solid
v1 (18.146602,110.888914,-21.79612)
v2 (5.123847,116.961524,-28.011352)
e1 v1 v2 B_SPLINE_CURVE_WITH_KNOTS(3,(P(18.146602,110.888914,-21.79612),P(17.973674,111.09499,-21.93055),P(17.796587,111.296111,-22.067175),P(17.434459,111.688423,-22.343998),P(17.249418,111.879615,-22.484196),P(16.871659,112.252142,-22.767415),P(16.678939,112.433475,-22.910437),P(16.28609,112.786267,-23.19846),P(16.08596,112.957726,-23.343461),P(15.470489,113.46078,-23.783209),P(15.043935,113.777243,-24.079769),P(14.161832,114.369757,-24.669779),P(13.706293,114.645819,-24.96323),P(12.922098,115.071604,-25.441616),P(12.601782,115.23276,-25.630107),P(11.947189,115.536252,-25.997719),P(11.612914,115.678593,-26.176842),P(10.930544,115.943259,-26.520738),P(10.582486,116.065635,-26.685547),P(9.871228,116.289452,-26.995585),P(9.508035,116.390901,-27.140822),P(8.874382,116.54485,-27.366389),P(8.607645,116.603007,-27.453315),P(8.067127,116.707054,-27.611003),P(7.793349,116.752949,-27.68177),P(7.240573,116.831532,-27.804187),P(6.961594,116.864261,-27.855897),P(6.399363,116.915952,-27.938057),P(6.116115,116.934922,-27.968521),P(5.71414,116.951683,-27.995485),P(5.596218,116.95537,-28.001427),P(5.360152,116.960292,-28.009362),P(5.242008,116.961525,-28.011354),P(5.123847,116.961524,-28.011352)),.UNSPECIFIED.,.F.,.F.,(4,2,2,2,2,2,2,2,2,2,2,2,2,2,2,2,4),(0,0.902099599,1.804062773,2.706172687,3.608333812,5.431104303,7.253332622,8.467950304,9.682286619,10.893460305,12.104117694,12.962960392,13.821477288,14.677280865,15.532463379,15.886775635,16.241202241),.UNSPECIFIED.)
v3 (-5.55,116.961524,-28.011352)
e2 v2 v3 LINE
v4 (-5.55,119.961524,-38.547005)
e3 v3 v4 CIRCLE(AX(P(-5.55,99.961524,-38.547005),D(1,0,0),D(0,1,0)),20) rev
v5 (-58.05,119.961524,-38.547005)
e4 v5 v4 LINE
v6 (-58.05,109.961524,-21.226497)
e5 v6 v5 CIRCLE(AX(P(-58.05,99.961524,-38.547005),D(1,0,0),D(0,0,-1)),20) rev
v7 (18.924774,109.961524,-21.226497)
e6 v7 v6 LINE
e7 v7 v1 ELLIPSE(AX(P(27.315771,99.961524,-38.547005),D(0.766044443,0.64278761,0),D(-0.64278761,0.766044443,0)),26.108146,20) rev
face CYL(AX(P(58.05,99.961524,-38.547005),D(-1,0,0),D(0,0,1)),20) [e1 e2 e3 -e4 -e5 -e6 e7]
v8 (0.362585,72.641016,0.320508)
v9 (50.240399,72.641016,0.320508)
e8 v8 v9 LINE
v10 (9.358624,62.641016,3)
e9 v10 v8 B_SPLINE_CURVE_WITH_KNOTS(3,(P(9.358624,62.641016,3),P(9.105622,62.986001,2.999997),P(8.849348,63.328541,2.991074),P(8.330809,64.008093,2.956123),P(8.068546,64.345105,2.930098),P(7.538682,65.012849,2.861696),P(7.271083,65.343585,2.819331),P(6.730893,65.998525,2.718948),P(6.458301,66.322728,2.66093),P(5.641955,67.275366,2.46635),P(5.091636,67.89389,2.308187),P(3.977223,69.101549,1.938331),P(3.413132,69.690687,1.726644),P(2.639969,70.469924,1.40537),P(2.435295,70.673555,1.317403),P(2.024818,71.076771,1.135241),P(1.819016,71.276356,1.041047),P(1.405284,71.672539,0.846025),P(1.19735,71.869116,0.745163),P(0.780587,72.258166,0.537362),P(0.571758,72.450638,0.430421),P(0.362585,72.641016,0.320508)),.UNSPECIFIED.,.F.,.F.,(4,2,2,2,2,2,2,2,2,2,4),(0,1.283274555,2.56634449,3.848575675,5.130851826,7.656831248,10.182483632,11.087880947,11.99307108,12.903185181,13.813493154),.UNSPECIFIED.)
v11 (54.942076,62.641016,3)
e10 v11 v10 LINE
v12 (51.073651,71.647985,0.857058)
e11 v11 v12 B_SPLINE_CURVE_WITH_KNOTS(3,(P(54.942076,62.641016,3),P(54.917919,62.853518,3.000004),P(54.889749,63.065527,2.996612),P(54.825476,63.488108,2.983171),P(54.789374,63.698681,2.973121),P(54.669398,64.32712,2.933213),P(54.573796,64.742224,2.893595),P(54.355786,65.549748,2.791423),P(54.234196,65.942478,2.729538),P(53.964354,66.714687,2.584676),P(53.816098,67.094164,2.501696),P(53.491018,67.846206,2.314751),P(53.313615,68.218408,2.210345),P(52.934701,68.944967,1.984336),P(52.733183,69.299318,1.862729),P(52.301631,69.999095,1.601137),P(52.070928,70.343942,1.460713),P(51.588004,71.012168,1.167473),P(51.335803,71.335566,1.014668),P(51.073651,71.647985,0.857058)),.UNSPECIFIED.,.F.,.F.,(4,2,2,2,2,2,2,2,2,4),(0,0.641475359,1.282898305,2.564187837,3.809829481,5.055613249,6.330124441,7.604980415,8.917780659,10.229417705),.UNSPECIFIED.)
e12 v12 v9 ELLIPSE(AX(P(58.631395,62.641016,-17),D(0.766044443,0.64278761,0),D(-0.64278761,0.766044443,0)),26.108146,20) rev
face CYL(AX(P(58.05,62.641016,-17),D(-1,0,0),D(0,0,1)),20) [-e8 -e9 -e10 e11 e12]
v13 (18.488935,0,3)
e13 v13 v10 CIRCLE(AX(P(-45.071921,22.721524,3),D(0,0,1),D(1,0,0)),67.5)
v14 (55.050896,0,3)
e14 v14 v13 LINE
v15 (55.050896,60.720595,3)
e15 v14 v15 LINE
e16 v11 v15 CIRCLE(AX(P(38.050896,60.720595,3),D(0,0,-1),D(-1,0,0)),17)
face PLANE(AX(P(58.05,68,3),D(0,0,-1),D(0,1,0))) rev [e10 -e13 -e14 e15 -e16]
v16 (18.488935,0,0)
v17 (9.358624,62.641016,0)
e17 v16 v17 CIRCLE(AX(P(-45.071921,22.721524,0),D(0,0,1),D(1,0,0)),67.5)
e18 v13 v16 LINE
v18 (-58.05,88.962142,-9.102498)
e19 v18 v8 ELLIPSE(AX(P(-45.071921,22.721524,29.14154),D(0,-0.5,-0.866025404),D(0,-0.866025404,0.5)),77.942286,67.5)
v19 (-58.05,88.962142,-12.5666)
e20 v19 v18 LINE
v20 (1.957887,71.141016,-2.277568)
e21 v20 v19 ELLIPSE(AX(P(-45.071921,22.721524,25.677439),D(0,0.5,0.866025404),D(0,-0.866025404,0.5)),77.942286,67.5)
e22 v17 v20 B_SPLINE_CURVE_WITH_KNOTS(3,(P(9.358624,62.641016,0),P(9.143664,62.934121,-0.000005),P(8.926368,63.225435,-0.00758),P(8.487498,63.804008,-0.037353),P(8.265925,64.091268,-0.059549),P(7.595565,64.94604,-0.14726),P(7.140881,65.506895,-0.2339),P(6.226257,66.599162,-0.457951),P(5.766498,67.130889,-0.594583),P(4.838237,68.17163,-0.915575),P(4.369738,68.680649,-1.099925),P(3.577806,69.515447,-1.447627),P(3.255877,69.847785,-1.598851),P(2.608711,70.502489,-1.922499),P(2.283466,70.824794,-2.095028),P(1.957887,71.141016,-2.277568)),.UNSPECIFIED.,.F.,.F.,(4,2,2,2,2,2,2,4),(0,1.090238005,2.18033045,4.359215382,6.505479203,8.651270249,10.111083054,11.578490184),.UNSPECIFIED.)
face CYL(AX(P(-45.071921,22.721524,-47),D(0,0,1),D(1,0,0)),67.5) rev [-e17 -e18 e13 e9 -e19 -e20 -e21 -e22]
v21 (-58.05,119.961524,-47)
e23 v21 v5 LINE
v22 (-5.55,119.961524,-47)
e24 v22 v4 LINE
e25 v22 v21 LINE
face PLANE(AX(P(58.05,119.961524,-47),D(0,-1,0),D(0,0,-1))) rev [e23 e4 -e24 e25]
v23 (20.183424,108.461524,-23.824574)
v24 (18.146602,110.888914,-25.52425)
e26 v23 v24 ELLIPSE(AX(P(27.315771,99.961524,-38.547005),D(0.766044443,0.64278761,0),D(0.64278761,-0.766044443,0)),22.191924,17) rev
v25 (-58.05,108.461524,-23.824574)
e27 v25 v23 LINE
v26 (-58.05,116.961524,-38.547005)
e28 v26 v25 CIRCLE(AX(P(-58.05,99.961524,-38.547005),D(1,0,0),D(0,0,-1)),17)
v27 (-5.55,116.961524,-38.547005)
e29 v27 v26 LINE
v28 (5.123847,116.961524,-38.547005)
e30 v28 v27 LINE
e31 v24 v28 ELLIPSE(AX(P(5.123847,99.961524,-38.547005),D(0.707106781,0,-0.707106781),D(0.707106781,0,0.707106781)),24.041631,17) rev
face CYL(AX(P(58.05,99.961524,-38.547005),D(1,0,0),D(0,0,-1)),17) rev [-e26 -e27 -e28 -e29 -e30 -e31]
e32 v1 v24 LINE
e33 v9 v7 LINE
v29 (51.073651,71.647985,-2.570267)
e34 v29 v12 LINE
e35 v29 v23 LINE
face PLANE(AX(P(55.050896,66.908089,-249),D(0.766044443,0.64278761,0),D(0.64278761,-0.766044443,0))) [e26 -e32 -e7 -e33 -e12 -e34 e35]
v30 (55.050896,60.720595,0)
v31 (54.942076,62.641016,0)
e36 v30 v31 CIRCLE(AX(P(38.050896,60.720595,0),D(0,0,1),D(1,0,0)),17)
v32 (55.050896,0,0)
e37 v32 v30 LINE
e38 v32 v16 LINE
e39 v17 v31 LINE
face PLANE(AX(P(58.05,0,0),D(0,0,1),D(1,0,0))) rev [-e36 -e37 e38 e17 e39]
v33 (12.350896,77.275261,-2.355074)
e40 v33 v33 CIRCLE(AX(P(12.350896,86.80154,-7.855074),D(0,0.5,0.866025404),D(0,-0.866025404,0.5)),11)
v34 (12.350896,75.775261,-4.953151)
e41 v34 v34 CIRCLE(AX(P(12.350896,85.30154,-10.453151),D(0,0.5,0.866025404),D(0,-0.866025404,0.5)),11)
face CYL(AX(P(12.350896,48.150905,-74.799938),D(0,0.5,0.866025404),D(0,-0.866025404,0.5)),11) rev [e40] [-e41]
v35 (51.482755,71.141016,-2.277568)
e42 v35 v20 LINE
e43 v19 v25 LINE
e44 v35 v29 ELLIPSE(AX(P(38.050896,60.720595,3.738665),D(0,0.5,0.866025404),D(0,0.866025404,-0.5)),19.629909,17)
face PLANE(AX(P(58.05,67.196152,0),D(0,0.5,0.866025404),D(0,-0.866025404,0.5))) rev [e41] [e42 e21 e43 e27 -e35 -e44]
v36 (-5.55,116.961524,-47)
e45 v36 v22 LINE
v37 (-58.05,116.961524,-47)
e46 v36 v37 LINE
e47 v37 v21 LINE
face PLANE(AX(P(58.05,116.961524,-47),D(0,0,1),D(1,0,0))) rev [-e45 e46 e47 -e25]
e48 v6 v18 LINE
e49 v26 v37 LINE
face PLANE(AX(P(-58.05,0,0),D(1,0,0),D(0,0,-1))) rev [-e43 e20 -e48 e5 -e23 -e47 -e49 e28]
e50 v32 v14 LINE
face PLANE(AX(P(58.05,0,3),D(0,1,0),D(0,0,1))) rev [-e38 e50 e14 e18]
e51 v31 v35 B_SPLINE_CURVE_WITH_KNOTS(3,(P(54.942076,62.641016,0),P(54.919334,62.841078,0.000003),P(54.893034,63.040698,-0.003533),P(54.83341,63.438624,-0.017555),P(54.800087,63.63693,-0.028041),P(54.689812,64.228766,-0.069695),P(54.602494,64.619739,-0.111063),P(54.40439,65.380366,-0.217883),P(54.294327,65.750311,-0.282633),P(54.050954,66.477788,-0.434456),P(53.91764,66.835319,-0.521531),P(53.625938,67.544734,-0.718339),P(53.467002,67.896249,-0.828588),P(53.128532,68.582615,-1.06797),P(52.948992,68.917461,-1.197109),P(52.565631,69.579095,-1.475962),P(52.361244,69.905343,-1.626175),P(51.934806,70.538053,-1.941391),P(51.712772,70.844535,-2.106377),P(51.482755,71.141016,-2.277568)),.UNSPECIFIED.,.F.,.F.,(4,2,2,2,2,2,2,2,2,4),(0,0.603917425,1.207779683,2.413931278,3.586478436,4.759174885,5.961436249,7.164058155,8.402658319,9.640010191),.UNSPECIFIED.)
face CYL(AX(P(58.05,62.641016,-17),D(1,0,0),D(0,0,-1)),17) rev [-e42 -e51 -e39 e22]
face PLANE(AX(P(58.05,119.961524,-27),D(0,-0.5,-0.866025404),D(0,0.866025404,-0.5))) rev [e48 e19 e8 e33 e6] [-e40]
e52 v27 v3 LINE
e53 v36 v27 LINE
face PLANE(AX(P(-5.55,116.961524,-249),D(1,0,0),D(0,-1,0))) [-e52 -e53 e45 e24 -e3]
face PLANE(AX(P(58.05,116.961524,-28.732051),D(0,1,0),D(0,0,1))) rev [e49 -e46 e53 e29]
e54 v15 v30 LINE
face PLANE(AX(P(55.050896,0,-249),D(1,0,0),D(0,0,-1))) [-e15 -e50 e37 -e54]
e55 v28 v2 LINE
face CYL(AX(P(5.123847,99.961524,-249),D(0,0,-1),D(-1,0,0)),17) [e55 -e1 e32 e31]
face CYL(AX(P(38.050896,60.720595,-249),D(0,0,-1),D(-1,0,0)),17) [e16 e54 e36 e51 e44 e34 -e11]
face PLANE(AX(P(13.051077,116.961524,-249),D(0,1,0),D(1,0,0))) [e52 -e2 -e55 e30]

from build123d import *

# Parameters (mm, degrees)
SALIENTE_EXTRUIR1_DEPTH = 58.05
REDONDEO1_R             = 20
REDONDEO2_R             = 20
REDONDEO3_R             = 17
REDONDEO4_R             = 17
CAVIDAD1_START          = -47
CAVIDAD1_DEPTH          = 50
CROQUIS16_R             = 67.5
CORTAR_EXTRUIR11_DEPTH  = 143.339628461
CROQUIS18_R             = 11
CORTAR_EXTRUIR12_DEPTH  = 142.06007654


# Read off the part's stored shape, not the designer's step: Cavidad1
with BuildPart() as part:
    # Croquis1 → Saliente-Extruir1 (new, symmetric)
    with BuildSketch(Plane(origin=(0, 0, 0), x_dir=(0, 0, -1), z_dir=(1, 0, 0))):
        Polygon((0, 0), (0, 67.196152423), (28.732050808, 116.961524227), (47, 116.961524227), (47, 119.961524227), (27, 119.961524227), (-3, 68), (-3, 0), align=None)
    extrude(amount=SALIENTE_EXTRUIR1_DEPTH, both=True)

    # Redondeo1
    redondeo1_edges = [part.edges().sort_by_distance(p)[0] for p in [
        (0, 68, 3),
    ]]
    fillet(redondeo1_edges, radius=REDONDEO1_R)

    # Redondeo2
    redondeo2_edges = [part.edges().sort_by_distance(p)[0] for p in [
        (0, 119.961524227, -27),
    ]]
    fillet(redondeo2_edges, radius=REDONDEO2_R)

    # Redondeo3
    redondeo3_edges = [part.edges().sort_by_distance(p)[0] for p in [
        (0, 116.961524227, -28.732050808),
    ]]
    fillet(redondeo3_edges, radius=REDONDEO3_R)

    # Redondeo4
    redondeo4_edges = [part.edges().sort_by_distance(p)[0] for p in [
        (0, 67.196152423, 0),
    ]]
    fillet(redondeo4_edges, radius=REDONDEO4_R)

    # Cavidad1 outline → Cavidad1 (cut)
    with BuildSketch(Plane.XY.offset(CAVIDAD1_START)):
        with BuildLine():
            Line((58.05, 0), (58.05, 119.961524227))
            Line((58.05, 119.961524227), (-5.55, 119.961524227))
            Line((-5.55, 119.961524227), (-5.55, 116.961524227))
            Line((-5.55, 116.961524227), (5.123846837, 116.961524227))
            ThreePointArc((5.123846837, 116.961524227), (12.308357287, 115.368756607), (18.14660237, 110.888913592))
            Line((18.14660237, 110.888913592), (51.073651347, 71.647984679))
            ThreePointArc((51.073651347, 71.647984679), (54.025670368, 66.534937751), (55.050895814, 60.720595315))
            Line((55.050895814, 60.720595315), (55.050895814, 0))
            Line((55.050895814, 0), (58.05, 0))
        make_face()
    extrude(amount=CAVIDAD1_DEPTH, mode=Mode.SUBTRACT)

    # Croquis16 → Cortar-Extruir11 (cut, through all)
    with BuildSketch(Plane.XY.offset(3)):
        with Locations((-45.071920691, 22.721524227)):
            Circle(CROQUIS16_R)
    extrude(amount=-CORTAR_EXTRUIR11_DEPTH, mode=Mode.SUBTRACT)

    # Croquis18 → Cortar-Extruir12 (cut, through all)
    with BuildSketch(Plane(origin=(0, 18.299038106, 31.694863729), x_dir=(1, 0, 0), z_dir=(0, 0.4999999999999976, 0.86602540378444))):
        with Locations(Location((12.350895814, 79.099876042, 0), (0, 0, 270))):
            Circle(CROQUIS18_R)
    extrude(amount=-CORTAR_EXTRUIR12_DEPTH, mode=Mode.SUBTRACT)


solid = part.part
